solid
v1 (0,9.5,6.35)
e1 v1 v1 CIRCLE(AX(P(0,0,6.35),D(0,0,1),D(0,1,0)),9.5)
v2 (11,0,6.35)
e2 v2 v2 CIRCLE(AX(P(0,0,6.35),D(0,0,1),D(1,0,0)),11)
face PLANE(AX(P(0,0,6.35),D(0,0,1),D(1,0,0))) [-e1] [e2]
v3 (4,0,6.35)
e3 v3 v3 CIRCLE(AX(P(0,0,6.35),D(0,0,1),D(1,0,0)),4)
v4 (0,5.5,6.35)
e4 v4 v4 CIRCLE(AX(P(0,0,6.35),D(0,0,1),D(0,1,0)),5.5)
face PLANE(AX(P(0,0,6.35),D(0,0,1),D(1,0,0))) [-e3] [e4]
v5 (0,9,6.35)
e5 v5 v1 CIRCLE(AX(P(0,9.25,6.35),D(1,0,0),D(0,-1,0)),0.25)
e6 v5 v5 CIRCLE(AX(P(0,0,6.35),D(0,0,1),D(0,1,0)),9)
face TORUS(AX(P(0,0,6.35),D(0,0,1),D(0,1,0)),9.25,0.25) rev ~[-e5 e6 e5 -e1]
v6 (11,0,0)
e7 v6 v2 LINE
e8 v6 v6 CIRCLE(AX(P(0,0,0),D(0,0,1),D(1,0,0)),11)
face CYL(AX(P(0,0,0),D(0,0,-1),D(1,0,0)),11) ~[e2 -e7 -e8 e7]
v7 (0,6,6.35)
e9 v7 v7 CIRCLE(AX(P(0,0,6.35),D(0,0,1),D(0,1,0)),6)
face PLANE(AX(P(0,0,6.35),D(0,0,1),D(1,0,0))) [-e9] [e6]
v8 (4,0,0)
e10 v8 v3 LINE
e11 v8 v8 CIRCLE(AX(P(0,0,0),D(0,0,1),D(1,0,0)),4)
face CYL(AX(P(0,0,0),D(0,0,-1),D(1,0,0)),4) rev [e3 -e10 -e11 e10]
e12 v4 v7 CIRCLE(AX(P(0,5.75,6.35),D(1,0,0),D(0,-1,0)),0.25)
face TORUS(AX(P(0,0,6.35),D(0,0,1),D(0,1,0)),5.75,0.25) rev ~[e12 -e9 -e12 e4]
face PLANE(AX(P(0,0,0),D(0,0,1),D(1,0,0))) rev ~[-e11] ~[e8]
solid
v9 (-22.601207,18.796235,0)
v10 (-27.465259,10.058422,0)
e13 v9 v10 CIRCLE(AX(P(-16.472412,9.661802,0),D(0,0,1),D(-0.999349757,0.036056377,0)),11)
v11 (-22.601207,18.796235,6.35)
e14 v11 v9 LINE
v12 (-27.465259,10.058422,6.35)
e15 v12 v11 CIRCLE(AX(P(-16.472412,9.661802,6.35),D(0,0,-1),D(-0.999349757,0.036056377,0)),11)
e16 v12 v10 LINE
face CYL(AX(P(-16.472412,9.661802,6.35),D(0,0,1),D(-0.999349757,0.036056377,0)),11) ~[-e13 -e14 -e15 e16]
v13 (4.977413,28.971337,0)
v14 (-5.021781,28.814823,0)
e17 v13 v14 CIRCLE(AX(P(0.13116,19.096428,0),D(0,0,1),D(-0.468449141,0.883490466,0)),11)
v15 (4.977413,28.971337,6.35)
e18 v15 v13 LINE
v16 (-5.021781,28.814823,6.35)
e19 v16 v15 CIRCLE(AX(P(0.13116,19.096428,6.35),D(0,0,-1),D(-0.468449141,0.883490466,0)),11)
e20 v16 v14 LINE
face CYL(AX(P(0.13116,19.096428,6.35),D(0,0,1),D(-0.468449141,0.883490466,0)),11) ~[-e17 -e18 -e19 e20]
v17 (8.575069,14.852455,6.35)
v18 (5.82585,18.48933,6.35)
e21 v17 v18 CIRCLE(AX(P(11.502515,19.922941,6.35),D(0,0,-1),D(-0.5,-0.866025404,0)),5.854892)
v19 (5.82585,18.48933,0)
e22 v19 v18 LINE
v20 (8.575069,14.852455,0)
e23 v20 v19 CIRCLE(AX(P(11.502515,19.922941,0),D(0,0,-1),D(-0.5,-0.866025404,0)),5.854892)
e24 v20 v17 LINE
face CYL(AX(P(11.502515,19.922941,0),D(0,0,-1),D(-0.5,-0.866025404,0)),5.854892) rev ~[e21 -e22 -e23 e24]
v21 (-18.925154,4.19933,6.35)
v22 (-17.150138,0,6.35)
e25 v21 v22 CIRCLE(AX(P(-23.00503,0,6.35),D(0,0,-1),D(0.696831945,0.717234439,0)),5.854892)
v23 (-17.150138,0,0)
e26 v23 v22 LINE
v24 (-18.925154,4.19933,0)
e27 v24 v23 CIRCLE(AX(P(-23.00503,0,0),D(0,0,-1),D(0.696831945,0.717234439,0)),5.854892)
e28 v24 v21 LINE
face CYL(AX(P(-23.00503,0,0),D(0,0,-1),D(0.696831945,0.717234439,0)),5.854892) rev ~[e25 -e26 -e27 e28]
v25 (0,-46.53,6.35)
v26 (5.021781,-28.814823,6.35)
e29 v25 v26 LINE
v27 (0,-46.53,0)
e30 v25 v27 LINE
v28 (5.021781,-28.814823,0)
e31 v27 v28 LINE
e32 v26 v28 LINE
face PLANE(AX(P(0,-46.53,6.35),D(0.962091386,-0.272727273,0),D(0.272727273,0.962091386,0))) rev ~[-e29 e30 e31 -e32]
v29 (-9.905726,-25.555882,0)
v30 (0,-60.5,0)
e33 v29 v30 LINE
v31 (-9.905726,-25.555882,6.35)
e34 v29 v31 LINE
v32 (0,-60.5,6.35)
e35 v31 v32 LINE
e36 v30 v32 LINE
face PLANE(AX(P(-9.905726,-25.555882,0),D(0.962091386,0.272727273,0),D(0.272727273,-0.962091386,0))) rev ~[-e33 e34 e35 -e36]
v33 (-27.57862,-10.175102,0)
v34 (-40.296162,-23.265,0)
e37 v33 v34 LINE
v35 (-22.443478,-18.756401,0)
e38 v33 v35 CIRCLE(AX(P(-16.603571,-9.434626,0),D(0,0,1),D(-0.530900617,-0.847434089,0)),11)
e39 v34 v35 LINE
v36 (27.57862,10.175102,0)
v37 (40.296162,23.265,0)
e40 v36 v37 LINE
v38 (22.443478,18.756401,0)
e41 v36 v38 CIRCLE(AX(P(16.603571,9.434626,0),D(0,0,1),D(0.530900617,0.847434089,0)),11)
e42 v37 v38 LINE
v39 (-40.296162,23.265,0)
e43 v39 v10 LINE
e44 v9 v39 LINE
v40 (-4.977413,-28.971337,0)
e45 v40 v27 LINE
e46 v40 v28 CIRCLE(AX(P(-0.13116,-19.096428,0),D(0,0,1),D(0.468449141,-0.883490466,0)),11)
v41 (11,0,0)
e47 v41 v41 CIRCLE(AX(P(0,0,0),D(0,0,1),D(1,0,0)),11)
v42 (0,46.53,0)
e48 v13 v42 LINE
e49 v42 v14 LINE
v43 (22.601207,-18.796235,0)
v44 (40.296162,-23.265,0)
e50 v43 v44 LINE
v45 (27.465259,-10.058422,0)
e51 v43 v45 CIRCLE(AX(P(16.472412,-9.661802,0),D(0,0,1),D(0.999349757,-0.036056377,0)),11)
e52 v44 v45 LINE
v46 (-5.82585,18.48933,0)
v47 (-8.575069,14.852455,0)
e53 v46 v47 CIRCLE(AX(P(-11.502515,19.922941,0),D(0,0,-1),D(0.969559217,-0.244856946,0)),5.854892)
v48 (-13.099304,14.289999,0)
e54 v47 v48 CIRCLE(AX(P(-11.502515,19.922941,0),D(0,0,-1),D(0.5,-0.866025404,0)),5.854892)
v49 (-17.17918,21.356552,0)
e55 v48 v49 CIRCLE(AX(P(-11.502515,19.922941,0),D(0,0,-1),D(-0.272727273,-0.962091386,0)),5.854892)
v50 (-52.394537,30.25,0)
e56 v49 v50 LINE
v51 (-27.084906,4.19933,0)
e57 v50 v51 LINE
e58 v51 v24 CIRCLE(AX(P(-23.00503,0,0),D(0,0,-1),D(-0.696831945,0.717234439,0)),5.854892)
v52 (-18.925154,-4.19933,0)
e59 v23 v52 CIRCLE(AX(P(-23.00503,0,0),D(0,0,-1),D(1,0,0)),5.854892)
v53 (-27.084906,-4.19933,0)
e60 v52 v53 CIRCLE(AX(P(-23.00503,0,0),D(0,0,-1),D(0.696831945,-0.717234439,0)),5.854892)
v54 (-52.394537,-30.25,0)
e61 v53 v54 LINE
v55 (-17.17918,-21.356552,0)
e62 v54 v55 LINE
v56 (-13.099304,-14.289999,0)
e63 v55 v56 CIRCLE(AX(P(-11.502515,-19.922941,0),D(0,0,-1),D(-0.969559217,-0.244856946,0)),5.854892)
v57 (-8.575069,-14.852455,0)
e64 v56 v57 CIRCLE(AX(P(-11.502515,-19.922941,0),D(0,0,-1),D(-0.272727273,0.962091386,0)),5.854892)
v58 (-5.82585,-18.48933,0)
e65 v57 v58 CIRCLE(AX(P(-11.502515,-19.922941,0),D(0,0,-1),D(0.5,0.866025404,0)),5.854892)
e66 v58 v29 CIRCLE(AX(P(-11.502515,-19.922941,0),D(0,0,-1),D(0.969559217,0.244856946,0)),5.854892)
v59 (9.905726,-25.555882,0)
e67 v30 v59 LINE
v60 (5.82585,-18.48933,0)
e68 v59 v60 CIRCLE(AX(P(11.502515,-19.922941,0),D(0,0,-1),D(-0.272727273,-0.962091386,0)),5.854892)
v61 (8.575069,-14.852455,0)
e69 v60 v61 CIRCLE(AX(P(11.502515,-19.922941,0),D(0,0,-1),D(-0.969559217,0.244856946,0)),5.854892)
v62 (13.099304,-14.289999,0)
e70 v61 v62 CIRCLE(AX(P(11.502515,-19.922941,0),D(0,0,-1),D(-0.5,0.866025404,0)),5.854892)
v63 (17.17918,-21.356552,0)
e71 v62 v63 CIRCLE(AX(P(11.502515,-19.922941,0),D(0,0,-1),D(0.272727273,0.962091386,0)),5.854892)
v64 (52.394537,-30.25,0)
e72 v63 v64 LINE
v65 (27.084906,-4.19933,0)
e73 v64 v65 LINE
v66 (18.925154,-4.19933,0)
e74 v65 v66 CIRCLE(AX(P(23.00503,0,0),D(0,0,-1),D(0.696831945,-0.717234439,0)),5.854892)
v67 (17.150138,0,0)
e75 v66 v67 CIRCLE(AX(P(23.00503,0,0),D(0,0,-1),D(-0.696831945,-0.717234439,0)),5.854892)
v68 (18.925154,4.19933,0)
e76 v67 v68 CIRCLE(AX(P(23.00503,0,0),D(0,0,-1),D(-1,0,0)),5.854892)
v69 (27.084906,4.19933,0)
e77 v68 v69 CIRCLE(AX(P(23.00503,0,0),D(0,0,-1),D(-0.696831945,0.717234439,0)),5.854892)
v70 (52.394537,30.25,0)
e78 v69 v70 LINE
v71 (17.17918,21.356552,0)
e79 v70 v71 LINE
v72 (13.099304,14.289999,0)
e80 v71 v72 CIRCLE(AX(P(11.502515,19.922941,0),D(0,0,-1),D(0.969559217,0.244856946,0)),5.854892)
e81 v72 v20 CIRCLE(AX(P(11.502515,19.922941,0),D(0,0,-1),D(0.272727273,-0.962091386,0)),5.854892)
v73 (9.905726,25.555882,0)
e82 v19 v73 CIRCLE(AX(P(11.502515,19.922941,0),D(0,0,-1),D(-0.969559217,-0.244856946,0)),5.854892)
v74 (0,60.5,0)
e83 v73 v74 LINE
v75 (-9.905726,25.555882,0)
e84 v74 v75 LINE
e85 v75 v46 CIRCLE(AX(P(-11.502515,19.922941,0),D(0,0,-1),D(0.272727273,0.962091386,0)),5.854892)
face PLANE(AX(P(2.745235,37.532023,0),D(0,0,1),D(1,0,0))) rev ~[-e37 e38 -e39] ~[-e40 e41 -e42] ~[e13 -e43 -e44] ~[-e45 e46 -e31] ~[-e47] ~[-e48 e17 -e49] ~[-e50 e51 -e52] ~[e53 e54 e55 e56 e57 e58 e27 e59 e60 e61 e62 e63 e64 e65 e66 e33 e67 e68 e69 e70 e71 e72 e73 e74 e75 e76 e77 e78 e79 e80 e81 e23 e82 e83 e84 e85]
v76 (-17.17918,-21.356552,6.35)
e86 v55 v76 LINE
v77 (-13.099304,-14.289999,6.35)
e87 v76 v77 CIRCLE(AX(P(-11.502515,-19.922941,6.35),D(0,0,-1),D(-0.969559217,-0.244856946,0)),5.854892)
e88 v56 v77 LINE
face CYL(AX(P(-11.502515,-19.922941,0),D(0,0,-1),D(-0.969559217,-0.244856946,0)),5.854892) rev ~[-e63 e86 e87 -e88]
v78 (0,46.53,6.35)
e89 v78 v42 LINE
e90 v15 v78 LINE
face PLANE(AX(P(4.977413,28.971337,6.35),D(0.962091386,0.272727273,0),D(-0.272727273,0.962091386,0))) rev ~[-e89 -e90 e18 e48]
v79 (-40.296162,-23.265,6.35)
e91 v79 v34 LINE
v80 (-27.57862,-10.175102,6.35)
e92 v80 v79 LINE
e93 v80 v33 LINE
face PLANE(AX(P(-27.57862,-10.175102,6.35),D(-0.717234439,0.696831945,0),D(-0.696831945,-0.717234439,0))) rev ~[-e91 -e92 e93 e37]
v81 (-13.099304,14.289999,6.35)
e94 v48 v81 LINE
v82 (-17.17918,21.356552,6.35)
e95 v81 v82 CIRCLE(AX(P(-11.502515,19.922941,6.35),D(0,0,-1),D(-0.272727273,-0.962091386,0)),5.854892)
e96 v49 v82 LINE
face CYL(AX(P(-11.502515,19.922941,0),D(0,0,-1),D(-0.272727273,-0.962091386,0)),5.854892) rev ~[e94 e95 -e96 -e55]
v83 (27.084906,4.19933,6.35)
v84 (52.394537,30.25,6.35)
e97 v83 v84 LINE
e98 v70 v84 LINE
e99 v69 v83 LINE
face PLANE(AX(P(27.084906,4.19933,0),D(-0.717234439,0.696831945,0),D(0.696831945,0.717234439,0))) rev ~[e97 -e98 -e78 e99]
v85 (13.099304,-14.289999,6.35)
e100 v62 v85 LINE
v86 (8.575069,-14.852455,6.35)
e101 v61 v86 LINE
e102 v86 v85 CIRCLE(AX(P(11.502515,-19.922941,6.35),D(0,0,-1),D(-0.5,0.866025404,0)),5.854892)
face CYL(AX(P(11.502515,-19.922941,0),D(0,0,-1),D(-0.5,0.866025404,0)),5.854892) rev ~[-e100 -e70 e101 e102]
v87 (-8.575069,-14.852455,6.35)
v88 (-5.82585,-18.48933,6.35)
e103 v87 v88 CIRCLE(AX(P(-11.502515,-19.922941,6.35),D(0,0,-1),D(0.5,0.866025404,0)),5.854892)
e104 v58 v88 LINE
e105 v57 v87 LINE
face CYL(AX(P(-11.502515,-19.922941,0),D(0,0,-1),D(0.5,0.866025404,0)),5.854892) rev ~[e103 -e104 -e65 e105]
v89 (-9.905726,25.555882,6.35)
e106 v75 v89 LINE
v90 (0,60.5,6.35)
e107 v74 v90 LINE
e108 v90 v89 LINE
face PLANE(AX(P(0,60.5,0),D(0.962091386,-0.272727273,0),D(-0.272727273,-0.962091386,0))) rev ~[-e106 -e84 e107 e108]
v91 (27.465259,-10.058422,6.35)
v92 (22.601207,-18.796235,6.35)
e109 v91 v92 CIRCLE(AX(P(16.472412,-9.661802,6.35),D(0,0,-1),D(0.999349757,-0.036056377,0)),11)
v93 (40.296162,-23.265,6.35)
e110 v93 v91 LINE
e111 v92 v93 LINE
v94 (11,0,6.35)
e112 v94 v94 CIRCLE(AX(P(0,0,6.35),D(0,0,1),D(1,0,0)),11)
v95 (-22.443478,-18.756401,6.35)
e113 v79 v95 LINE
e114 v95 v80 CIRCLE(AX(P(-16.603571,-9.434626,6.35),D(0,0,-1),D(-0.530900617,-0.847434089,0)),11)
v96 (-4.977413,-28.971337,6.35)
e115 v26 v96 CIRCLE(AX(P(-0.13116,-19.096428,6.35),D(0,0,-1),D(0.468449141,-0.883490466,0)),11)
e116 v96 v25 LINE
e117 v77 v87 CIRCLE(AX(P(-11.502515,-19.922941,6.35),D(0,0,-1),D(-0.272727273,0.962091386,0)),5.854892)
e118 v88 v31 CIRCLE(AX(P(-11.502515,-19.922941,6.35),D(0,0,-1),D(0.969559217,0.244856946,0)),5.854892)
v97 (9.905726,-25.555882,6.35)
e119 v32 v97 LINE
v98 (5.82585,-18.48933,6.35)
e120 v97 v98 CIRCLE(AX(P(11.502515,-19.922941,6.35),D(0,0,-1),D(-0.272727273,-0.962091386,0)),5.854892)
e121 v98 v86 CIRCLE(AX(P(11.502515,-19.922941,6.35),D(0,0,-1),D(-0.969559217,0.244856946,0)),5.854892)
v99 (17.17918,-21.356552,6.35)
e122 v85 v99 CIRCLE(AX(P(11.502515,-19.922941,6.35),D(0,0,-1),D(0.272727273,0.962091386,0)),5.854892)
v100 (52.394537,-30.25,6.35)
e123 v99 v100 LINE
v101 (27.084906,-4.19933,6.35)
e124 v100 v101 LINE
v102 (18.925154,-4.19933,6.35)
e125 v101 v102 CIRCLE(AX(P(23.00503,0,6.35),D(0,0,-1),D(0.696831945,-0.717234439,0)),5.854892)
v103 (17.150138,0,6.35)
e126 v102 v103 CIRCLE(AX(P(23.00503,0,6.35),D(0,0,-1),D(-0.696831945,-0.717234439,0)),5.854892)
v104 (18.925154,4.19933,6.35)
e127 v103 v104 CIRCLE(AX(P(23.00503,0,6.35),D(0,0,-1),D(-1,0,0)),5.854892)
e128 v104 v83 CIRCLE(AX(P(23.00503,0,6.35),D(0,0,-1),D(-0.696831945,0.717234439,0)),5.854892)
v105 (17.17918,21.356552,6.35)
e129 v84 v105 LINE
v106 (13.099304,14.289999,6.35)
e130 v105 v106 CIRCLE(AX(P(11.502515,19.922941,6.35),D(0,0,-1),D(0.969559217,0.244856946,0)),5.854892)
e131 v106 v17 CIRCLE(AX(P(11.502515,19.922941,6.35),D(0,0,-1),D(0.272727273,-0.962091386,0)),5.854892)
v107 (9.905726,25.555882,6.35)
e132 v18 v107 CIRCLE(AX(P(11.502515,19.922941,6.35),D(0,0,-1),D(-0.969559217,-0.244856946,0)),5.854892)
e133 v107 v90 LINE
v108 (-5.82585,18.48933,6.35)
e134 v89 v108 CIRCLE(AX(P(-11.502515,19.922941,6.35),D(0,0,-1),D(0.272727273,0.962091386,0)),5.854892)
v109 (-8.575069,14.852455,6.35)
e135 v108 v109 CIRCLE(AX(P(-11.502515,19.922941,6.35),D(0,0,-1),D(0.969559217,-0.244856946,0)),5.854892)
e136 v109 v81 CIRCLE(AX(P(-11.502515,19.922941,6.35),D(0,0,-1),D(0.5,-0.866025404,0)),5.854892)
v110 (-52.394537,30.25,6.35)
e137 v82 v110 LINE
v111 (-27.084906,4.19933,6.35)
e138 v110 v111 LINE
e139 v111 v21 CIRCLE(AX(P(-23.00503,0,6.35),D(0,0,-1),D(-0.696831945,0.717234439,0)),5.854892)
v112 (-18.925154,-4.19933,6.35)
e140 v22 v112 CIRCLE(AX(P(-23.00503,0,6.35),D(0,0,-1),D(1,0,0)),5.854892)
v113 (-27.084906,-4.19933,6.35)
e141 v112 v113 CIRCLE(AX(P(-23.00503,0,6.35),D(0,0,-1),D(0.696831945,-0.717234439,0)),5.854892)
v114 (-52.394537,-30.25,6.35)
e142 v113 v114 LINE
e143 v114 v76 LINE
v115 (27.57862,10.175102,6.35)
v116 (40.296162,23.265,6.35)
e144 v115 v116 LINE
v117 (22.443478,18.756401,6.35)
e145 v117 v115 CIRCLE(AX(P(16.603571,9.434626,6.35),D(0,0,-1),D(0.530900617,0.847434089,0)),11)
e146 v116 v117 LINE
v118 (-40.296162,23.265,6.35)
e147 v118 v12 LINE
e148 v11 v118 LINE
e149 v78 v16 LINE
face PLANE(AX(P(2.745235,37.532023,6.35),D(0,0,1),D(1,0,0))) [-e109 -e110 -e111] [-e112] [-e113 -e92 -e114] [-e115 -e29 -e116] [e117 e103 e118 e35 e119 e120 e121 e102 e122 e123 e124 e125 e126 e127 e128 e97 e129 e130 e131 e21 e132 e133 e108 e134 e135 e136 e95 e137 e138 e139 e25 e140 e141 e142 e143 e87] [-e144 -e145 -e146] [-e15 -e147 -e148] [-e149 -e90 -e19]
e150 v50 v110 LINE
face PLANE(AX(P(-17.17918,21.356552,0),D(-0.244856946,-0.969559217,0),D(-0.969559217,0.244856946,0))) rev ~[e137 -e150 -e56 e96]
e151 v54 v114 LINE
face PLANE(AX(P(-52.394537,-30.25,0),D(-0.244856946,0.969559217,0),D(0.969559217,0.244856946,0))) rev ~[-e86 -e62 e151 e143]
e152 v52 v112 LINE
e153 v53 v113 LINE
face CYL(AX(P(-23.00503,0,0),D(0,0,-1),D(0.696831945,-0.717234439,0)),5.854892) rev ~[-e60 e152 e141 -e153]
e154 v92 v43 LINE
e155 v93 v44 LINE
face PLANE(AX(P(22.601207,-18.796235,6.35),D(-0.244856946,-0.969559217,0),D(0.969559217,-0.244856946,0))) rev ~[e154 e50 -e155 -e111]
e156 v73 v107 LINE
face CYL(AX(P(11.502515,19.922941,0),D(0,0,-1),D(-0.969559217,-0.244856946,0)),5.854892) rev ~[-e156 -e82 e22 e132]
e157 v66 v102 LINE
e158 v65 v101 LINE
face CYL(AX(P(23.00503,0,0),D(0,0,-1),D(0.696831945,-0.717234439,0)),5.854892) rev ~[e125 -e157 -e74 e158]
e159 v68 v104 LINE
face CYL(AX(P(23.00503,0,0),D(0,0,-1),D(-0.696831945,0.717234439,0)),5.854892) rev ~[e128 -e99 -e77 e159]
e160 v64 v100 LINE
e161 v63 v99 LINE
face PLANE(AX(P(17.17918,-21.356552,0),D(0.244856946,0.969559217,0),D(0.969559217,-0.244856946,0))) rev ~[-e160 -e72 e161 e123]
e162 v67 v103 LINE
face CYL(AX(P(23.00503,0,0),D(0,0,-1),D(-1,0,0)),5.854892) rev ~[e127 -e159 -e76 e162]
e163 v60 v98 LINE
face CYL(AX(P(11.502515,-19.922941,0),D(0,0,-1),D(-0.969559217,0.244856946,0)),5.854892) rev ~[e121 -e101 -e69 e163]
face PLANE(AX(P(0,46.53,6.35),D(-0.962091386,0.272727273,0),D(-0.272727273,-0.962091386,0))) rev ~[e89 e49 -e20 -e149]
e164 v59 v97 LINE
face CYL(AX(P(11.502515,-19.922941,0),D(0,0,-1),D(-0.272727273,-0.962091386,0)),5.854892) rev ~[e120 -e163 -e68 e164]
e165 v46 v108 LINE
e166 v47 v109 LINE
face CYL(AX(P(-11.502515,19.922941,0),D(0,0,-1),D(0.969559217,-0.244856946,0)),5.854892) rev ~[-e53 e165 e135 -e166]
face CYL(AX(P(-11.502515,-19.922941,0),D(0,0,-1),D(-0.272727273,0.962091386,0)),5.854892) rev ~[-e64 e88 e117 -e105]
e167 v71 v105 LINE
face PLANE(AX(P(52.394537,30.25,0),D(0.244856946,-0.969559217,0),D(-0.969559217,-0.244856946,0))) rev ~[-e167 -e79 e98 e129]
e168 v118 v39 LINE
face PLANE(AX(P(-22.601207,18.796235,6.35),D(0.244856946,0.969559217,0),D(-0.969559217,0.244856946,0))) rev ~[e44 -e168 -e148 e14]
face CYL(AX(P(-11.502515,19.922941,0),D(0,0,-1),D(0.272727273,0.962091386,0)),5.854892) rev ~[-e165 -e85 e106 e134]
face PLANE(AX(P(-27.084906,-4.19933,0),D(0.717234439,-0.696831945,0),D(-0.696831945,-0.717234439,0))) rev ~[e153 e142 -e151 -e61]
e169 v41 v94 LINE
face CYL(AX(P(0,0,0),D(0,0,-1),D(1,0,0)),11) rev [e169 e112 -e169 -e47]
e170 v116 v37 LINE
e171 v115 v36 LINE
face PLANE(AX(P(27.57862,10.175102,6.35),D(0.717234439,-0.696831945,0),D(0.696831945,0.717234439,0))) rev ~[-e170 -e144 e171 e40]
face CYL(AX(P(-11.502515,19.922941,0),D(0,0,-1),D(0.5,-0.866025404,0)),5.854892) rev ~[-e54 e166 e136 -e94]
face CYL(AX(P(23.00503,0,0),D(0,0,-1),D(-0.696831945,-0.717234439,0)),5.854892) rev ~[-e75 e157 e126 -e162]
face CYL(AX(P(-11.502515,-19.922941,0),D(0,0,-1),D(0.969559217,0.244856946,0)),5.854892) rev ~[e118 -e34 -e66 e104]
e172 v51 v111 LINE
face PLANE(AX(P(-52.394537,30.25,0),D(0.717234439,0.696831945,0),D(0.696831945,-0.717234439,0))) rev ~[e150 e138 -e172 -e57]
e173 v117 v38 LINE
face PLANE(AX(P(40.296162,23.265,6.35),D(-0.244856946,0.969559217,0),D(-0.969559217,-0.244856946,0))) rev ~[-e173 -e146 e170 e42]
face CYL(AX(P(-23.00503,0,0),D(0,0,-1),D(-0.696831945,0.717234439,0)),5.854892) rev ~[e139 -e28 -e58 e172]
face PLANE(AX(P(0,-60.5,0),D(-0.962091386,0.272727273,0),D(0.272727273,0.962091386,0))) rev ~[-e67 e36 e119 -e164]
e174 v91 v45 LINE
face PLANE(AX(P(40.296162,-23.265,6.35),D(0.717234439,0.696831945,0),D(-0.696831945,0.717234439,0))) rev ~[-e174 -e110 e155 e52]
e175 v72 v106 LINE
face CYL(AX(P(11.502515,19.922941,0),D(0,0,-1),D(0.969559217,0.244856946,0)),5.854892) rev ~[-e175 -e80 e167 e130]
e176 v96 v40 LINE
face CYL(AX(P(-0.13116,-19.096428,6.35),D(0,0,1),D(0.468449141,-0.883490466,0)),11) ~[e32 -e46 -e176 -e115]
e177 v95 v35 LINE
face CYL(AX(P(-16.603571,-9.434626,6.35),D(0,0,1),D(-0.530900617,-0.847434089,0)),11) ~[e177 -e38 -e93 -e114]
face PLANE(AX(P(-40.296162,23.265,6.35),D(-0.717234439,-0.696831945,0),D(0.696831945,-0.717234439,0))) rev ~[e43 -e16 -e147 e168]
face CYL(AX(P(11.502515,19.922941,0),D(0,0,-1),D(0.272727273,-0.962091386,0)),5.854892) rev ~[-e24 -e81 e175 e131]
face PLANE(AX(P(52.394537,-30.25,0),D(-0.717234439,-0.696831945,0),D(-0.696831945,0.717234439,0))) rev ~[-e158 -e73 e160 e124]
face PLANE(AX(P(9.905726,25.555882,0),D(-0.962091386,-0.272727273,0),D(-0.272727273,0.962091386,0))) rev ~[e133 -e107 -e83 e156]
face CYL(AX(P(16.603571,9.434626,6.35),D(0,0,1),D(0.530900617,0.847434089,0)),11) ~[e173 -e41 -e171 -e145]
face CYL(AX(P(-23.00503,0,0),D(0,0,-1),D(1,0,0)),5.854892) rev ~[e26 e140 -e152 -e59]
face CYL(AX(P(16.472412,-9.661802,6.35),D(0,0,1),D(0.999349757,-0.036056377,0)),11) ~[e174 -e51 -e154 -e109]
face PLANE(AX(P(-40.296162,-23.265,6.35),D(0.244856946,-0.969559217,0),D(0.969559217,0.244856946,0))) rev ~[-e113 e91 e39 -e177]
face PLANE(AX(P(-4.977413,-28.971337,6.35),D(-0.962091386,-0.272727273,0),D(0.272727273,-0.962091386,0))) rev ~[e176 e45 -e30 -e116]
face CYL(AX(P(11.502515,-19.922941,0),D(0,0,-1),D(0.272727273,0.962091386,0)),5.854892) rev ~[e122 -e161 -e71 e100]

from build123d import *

# Parameters (mm, degrees)
F1_R     = 11
F1_R_2   = 4
F2_DEPTH = 6.35
F5_R     = 11
F6_DEPTH = 6.35
F8_DEPTH = 25.4


with BuildPart() as f2:
    # F1 (on Top) → F2 (new body)
    with BuildSketch(Plane.XY):
        Circle(F1_R)
        Circle(F1_R_2, mode=Mode.SUBTRACT)
    extrude(amount=F2_DEPTH)

    # F3 (on Right) → F4 (revolve, cut)
    with BuildSketch(Plane.YZ):
        with BuildLine():
            ThreePointArc((6, 6.35), (5.75, 6.6), (5.5, 6.35))
            Line((5.5, 6.35), (5.75, 6.35))
            Line((5.75, 6.35), (6, 6.35))
        make_face()
        with BuildLine():
            ThreePointArc((9.5, 6.35), (9.25, 6.6), (9, 6.35))
            Line((9, 6.35), (9.25, 6.35))
            Line((9.25, 6.35), (9.5, 6.35))
        make_face()
        with BuildLine():
            Line((9.25, 6.35), (9, 6.35))
            ThreePointArc((9, 6.35), (9.25, 6.1), (9.5, 6.35))
            Line((9.5, 6.35), (9.25, 6.35))
        make_face()
        with BuildLine():
            Line((5.75, 6.35), (5.5, 6.35))
            ThreePointArc((5.5, 6.35), (5.75, 6.1), (6, 6.35))
            Line((6, 6.35), (5.75, 6.35))
        make_face()
    revolve(axis=Axis((0, 0, 3.175), (0, 0, 1)), mode=Mode.SUBTRACT)


with BuildPart() as f6:
    # F5 (on Top) → F6 (new body)
    with BuildSketch(Plane.XY):
        with BuildLine():
            Line((0, 60.5), (0, 17.0180425354))
            Line((0, 17.0180425354), (5.8258503254, 18.4893295859))
            ThreePointArc((5.8258503254, 18.4893295859), (6.4320296551, 22.8503868027), (9.9057263273, 25.5558821098))
            Line((9.9057263273, 25.5558821098), (0, 60.5))
        make_face()
        with BuildLine():
            Line((-5.8258503254, 18.4893295859), (0, 17.0180425354))
            Line((0, 17.0180425354), (0, 60.5))
            Line((0, 60.5), (-9.9057263273, 25.5558821098))
            ThreePointArc((-9.9057263273, 25.5558821098), (-6.4320296551, 22.8503868027), (-5.8258503254, 18.4893295859))
        make_face()
        with BuildLine():
            Line((-18.9251542831, 4.1993304125), (-14.7380571583, 8.5090212677))
            Line((-14.7380571583, 8.5090212677), (-13.0993039576, 14.2899991734))
            ThreePointArc((-13.0993039576, 14.2899991734), (-16.5730006299, 16.9954944805), (-17.1791799596, 21.3565516973))
            Line((-17.1791799596, 21.3565516973), (-52.394536929, 30.25))
            Line((-52.394536929, 30.25), (-27.0849062869, 4.1993304125))
            ThreePointArc((-27.0849062869, 4.1993304125), (-23.005030285, 5.8548923222), (-18.9251542831, 4.1993304125))
        make_face()
        with BuildLine():
            Line((-13.0993039576, -14.2899991734), (-14.7380571583, -8.5090212677))
            Line((-14.7380571583, -8.5090212677), (-18.9251542831, -4.1993304125))
            ThreePointArc((-18.9251542831, -4.1993304125), (-23.005030285, -5.8548923222), (-27.0849062869, -4.1993304125))
            Line((-27.0849062869, -4.1993304125), (-52.394536929, -30.25))
            Line((-52.394536929, -30.25), (-17.1791799596, -21.3565516973))
            ThreePointArc((-17.1791799596, -21.3565516973), (-16.5730006299, -16.9954944805), (-13.0993039576, -14.2899991734))
        make_face()
        with BuildLine():
            Line((5.8258503254, -18.4893295859), (0, -17.0180425354))
            Line((0, -17.0180425354), (-5.8258503254, -18.4893295859))
            ThreePointArc((-5.8258503254, -18.4893295859), (-6.4320296551, -22.8503868027), (-9.9057263273, -25.5558821098))
            Line((-9.9057263273, -25.5558821098), (0, -60.5))
            Line((0, -60.5), (9.9057263273, -25.5558821098))
            ThreePointArc((9.9057263273, -25.5558821098), (6.4320296551, -22.8503868027), (5.8258503254, -18.4893295859))
        make_face()
        with BuildLine():
            Line((18.9251542831, -4.1993304125), (14.7380571583, -8.5090212677))
            Line((14.7380571583, -8.5090212677), (13.0993039576, -14.2899991734))
            ThreePointArc((13.0993039576, -14.2899991734), (16.5730006299, -16.9954944805), (17.1791799596, -21.3565516973))
            Line((17.1791799596, -21.3565516973), (52.394536929, -30.25))
            Line((52.394536929, -30.25), (27.0849062869, -4.1993304125))
            ThreePointArc((27.0849062869, -4.1993304125), (23.005030285, -5.8548923222), (18.9251542831, -4.1993304125))
        make_face()
        with BuildLine():
            Line((13.0993039576, 14.2899991734), (14.7380571583, 8.5090212677))
            Line((14.7380571583, 8.5090212677), (18.9251542831, 4.1993304125))
            ThreePointArc((18.9251542831, 4.1993304125), (23.005030285, 5.8548923222), (27.0849062869, 4.1993304125))
            Line((27.0849062869, 4.1993304125), (52.394536929, 30.25))
            Line((52.394536929, 30.25), (17.1791799596, 21.3565516973))
            ThreePointArc((17.1791799596, 21.3565516973), (16.5730006299, 16.9954944805), (13.0993039576, 14.2899991734))
        make_face()
        with BuildLine():
            ThreePointArc((15.8745077989, 4.5000002382), (16.3428788572, 2.2716317174), (16.5, 0))
            ThreePointArc((16.5, 0), (16.3428788623, -2.2716316803), (15.8745078193, -4.5000001663))
            Line((15.8745078193, -4.5000001663), (17.1501379628, 0))
            Line((17.1501379628, 0), (15.8745077989, 4.5000002382))
        make_face()
        with BuildLine():
            ThreePointArc((4.0401396495, 15.9977270764), (8.2500001412, 14.2894190809), (11.8343684535, 11.4977268756))
            Line((11.8343684535, 11.4977268756), (8.5750689814, 14.8524551542))
            Line((8.5750689814, 14.8524551542), (4.0401396495, 15.9977270764))
        make_face()
        with BuildLine():
            ThreePointArc((-11.8343682103, 11.4977271259), (-8.249999909, 14.289419215), (-4.0401394678, 15.9977271223))
            Line((-4.0401394678, 15.9977271223), (-8.5750689814, 14.8524551542))
            Line((-8.5750689814, 14.8524551542), (-11.8343682103, 11.4977271259))
        make_face()
        with BuildLine():
            Line((-17.1501379628, 0), (-15.8745078556, -4.5000000379))
            ThreePointArc((-15.8745078556, -4.5000000379), (-16.5, -4.12e-08), (-15.8745078781, 4.4999999586))
            Line((-15.8745078781, 4.4999999586), (-17.1501379628, 0))
        make_face()
        with BuildLine():
            Line((-8.5750689814, -14.8524551542), (-4.0401397191, -15.9977270589))
            ThreePointArc((-4.0401397191, -15.9977270589), (-8.2500001243, -14.2894190907), (-11.8343683762, -11.4977269552))
            Line((-11.8343683762, -11.4977269552), (-8.5750689814, -14.8524551542))
        make_face()
        with BuildLine():
            Line((8.5750689814, -14.8524551542), (11.8343682034, -11.4977271331))
            ThreePointArc((11.8343682034, -11.4977271331), (8.2500000987, -14.2894191055), (4.0401399023, -15.9977270126))
            Line((4.0401399023, -15.9977270126), (8.5750689814, -14.8524551542))
        make_face()
        with BuildLine():
            Line((14.7380571583, -8.5090212677), (11.8343682034, -11.4977271331))
            Line((11.8343682034, -11.4977271331), (8.5750689814, -14.8524551542))
            ThreePointArc((8.5750689814, -14.8524551542), (10.780191513, -14.1127760417), (13.0993039576, -14.2899991734))
            Line((13.0993039576, -14.2899991734), (14.7380571583, -8.5090212677))
        make_face()
        with BuildLine():
            Line((8.5750689814, -14.8524551542), (4.0401399023, -15.9977270126))
            Line((4.0401399023, -15.9977270126), (0, -17.0180425354))
            Line((0, -17.0180425354), (5.8258503254, -18.4893295859))
            ThreePointArc((5.8258503254, -18.4893295859), (6.8319268135, -16.3923077288), (8.5750689814, -14.8524551542))
        make_face()
        with BuildLine():
            Line((14.7380571583, 8.5090212677), (15.8745077989, 4.5000002382))
            Line((15.8745077989, 4.5000002382), (17.1501379628, 0))
            ThreePointArc((17.1501379628, 0), (17.6121183265, 2.2795316871), (18.9251542831, 4.1993304125))
            Line((18.9251542831, 4.1993304125), (14.7380571583, 8.5090212677))
        make_face()
        with BuildLine():
            Line((17.1501379628, 0), (15.8745078193, -4.5000001663))
            Line((15.8745078193, -4.5000001663), (14.7380571583, -8.5090212677))
            Line((14.7380571583, -8.5090212677), (18.9251542831, -4.1993304125))
            ThreePointArc((18.9251542831, -4.1993304125), (17.6121183265, -2.2795316871), (17.1501379628, 0))
        make_face()
        with BuildLine():
            Line((8.5750689814, 14.8524551542), (11.8343684535, 11.4977268756))
            Line((11.8343684535, 11.4977268756), (14.7380571583, 8.5090212677))
            Line((14.7380571583, 8.5090212677), (13.0993039576, 14.2899991734))
            ThreePointArc((13.0993039576, 14.2899991734), (10.780191513, 14.1127760417), (8.5750689814, 14.8524551542))
        make_face()
        with BuildLine():
            Line((-14.7380571583, 8.5090212677), (-11.8343682103, 11.4977271259))
            Line((-11.8343682103, 11.4977271259), (-8.5750689814, 14.8524551542))
            ThreePointArc((-8.5750689814, 14.8524551542), (-10.780191513, 14.1127760417), (-13.0993039576, 14.2899991734))
            Line((-13.0993039576, 14.2899991734), (-14.7380571583, 8.5090212677))
        make_face()
        with BuildLine():
            Line((-4.0401394678, 15.9977271223), (0, 17.0180425354))
            Line((0, 17.0180425354), (-5.8258503254, 18.4893295859))
            ThreePointArc((-5.8258503254, 18.4893295859), (-6.8319268135, 16.3923077288), (-8.5750689814, 14.8524551542))
            Line((-8.5750689814, 14.8524551542), (-4.0401394678, 15.9977271223))
        make_face()
        with BuildLine():
            Line((-14.7380571583, -8.5090212677), (-15.8745078556, -4.5000000379))
            Line((-15.8745078556, -4.5000000379), (-17.1501379628, 0))
            ThreePointArc((-17.1501379628, 0), (-17.6121183265, -2.2795316871), (-18.9251542831, -4.1993304125))
            Line((-18.9251542831, -4.1993304125), (-14.7380571583, -8.5090212677))
        make_face()
        with BuildLine():
            Line((-17.1501379628, 0), (-15.8745078781, 4.4999999586))
            Line((-15.8745078781, 4.4999999586), (-14.7380571583, 8.5090212677))
            Line((-14.7380571583, 8.5090212677), (-18.9251542831, 4.1993304125))
            ThreePointArc((-18.9251542831, 4.1993304125), (-17.6121183265, 2.2795316871), (-17.1501379628, 0))
        make_face()
        with BuildLine():
            Line((0, -17.0180425354), (-4.0401397191, -15.9977270589))
            Line((-4.0401397191, -15.9977270589), (-8.5750689814, -14.8524551542))
            ThreePointArc((-8.5750689814, -14.8524551542), (-6.8319268135, -16.3923077288), (-5.8258503254, -18.4893295859))
            Line((-5.8258503254, -18.4893295859), (0, -17.0180425354))
        make_face()
        with BuildLine():
            Line((-8.5750689814, -14.8524551542), (-11.8343683762, -11.4977269552))
            Line((-11.8343683762, -11.4977269552), (-14.7380571583, -8.5090212677))
            Line((-14.7380571583, -8.5090212677), (-13.0993039576, -14.2899991734))
            ThreePointArc((-13.0993039576, -14.2899991734), (-10.780191513, -14.1127760417), (-8.5750689814, -14.8524551542))
        make_face()
        with BuildLine():
            ThreePointArc((15.8745078193, -4.5000001663), (16.3428788623, -2.2716316803), (16.5, 0))
            ThreePointArc((16.5, 0), (16.3428788572, 2.2716317174), (15.8745077989, 4.5000002382))
            ThreePointArc((15.8745077989, 4.5000002382), (14.2894191735, 8.2499999809), (11.8343684535, 11.4977268756))
            ThreePointArc((11.8343684535, 11.4977268756), (8.2500001412, 14.2894190809), (4.0401396495, 15.9977270764))
            ThreePointArc((4.0401396495, 15.9977270764), (2.0356206963, 16.3739502986), (0, 16.5))
            ThreePointArc((0, 16.5), (-2.0356206033, 16.3739503102), (-4.0401394678, 15.9977271223))
            ThreePointArc((-4.0401394678, 15.9977271223), (-8.249999909, 14.289419215), (-11.8343682103, 11.4977271259))
            ThreePointArc((-11.8343682103, 11.4977271259), (-14.2894191589, 8.2500000062), (-15.8745078781, 4.4999999586))
            ThreePointArc((-15.8745078781, 4.4999999586), (-16.5, -4.12e-08), (-15.8745078556, -4.5000000379))
            ThreePointArc((-15.8745078556, -4.5000000379), (-14.2894191978, -8.2499999388), (-11.8343683762, -11.4977269552))
            ThreePointArc((-11.8343683762, -11.4977269552), (-8.2500001243, -14.2894190907), (-4.0401397191, -15.9977270589))
            ThreePointArc((-4.0401397191, -15.9977270589), (9.45e-08, -16.5), (4.0401399023, -15.9977270126))
            ThreePointArc((4.0401399023, -15.9977270126), (8.2500000987, -14.2894191055), (11.8343682034, -11.4977271331))
            ThreePointArc((11.8343682034, -11.4977271331), (14.2894191024, -8.2500001039), (15.8745078193, -4.5000001663))
        make_face()
        Circle(F5_R, mode=Mode.SUBTRACT)
        with BuildLine():
            ThreePointArc((-15.8745078781, 4.4999999586), (-14.2894191589, 8.2500000062), (-11.8343682103, 11.4977271259))
            Line((-11.8343682103, 11.4977271259), (-14.7380571583, 8.5090212677))
            Line((-14.7380571583, 8.5090212677), (-15.8745078781, 4.4999999586))
        make_face()
        with BuildLine():
            ThreePointArc((-4.0401394678, 15.9977271223), (-2.0356206033, 16.3739503102), (0, 16.5))
            Line((0, 16.5), (0, 17.0180425354))
            Line((0, 17.0180425354), (-4.0401394678, 15.9977271223))
        make_face()
        with BuildLine():
            ThreePointArc((0, 16.5), (2.0356206963, 16.3739502986), (4.0401396495, 15.9977270764))
            Line((4.0401396495, 15.9977270764), (0, 17.0180425354))
            Line((0, 17.0180425354), (0, 16.5))
        make_face()
        with BuildLine():
            Line((0, 17.0180425354), (4.0401396495, 15.9977270764))
            Line((4.0401396495, 15.9977270764), (8.5750689814, 14.8524551542))
            ThreePointArc((8.5750689814, 14.8524551542), (6.8319268135, 16.3923077288), (5.8258503254, 18.4893295859))
            Line((5.8258503254, 18.4893295859), (0, 17.0180425354))
        make_face()
        with BuildLine():
            Line((-14.7380571583, -8.5090212677), (-11.8343683762, -11.4977269552))
            ThreePointArc((-11.8343683762, -11.4977269552), (-14.2894191978, -8.2499999388), (-15.8745078556, -4.5000000379))
            Line((-15.8745078556, -4.5000000379), (-14.7380571583, -8.5090212677))
        make_face()
        with BuildLine():
            Line((0, -17.0180425354), (4.0401399023, -15.9977270126))
            ThreePointArc((4.0401399023, -15.9977270126), (9.45e-08, -16.5), (-4.0401397191, -15.9977270589))
            Line((-4.0401397191, -15.9977270589), (0, -17.0180425354))
        make_face()
        with BuildLine():
            Line((14.7380571583, -8.5090212677), (15.8745078193, -4.5000001663))
            ThreePointArc((15.8745078193, -4.5000001663), (14.2894191024, -8.2500001039), (11.8343682034, -11.4977271331))
            Line((11.8343682034, -11.4977271331), (14.7380571583, -8.5090212677))
        make_face()
        with BuildLine():
            ThreePointArc((11.8343684535, 11.4977268756), (14.2894191735, 8.2499999809), (15.8745077989, 4.5000002382))
            Line((15.8745077989, 4.5000002382), (14.7380571583, 8.5090212677))
            Line((14.7380571583, 8.5090212677), (11.8343684535, 11.4977268756))
        make_face()
    extrude(amount=F6_DEPTH)

    # F7 (on face) → F8 (cut)
    with BuildSketch(Plane.XY.offset(6.35)):
        with BuildLine():
            ThreePointArc((27.4652588739, -10.0584216992), (26.0836032425, -15.0120346435), (22.6012069234, -18.7962346069))
            Line((22.6012069234, -18.7962346069), (40.2961620381, -23.265))
            Line((40.2961620381, -23.265), (27.4652588739, -10.0584216992))
        make_face()
        with BuildLine():
            ThreePointArc((5.0217807235, -28.814822756), (0.0409982575, -30.095080352), (-4.9774132034, -28.9713366553))
            Line((-4.9774132034, -28.9713366553), (0, -46.53))
            Line((0, -46.53), (5.0217807235, -28.814822756))
        make_face()
        with BuildLine():
            ThreePointArc((-22.4434781505, -18.7564010567), (-26.042604985, -15.0830457085), (-27.5786201268, -10.1751020484))
            Line((-27.5786201268, -10.1751020484), (-40.2961620381, -23.265))
            Line((-40.2961620381, -23.265), (-22.4434781505, -18.7564010567))
        make_face()
        with BuildLine():
            ThreePointArc((-27.4652588739, 10.0584216992), (-26.0836032425, 15.0120346435), (-22.6012069234, 18.7962346069))
            Line((-22.6012069234, 18.7962346069), (-40.2961620381, 23.265))
            Line((-40.2961620381, 23.265), (-27.4652588739, 10.0584216992))
        make_face()
        with BuildLine():
            ThreePointArc((-5.0217807235, 28.814822756), (-0.0409982575, 30.095080352), (4.9774132034, 28.9713366553))
            Line((4.9774132034, 28.9713366553), (0, 46.53))
            Line((0, 46.53), (-5.0217807235, 28.814822756))
        make_face()
        with BuildLine():
            ThreePointArc((22.4434781505, 18.7564010567), (26.042604985, 15.0830457085), (27.5786201268, 10.1751020484))
            Line((27.5786201268, 10.1751020484), (40.2961620381, 23.265))
            Line((40.2961620381, 23.265), (22.4434781505, 18.7564010567))
        make_face()
    extrude(amount=-F8_DEPTH, mode=Mode.SUBTRACT)


solid = Compound([f2.part, f6.part])
